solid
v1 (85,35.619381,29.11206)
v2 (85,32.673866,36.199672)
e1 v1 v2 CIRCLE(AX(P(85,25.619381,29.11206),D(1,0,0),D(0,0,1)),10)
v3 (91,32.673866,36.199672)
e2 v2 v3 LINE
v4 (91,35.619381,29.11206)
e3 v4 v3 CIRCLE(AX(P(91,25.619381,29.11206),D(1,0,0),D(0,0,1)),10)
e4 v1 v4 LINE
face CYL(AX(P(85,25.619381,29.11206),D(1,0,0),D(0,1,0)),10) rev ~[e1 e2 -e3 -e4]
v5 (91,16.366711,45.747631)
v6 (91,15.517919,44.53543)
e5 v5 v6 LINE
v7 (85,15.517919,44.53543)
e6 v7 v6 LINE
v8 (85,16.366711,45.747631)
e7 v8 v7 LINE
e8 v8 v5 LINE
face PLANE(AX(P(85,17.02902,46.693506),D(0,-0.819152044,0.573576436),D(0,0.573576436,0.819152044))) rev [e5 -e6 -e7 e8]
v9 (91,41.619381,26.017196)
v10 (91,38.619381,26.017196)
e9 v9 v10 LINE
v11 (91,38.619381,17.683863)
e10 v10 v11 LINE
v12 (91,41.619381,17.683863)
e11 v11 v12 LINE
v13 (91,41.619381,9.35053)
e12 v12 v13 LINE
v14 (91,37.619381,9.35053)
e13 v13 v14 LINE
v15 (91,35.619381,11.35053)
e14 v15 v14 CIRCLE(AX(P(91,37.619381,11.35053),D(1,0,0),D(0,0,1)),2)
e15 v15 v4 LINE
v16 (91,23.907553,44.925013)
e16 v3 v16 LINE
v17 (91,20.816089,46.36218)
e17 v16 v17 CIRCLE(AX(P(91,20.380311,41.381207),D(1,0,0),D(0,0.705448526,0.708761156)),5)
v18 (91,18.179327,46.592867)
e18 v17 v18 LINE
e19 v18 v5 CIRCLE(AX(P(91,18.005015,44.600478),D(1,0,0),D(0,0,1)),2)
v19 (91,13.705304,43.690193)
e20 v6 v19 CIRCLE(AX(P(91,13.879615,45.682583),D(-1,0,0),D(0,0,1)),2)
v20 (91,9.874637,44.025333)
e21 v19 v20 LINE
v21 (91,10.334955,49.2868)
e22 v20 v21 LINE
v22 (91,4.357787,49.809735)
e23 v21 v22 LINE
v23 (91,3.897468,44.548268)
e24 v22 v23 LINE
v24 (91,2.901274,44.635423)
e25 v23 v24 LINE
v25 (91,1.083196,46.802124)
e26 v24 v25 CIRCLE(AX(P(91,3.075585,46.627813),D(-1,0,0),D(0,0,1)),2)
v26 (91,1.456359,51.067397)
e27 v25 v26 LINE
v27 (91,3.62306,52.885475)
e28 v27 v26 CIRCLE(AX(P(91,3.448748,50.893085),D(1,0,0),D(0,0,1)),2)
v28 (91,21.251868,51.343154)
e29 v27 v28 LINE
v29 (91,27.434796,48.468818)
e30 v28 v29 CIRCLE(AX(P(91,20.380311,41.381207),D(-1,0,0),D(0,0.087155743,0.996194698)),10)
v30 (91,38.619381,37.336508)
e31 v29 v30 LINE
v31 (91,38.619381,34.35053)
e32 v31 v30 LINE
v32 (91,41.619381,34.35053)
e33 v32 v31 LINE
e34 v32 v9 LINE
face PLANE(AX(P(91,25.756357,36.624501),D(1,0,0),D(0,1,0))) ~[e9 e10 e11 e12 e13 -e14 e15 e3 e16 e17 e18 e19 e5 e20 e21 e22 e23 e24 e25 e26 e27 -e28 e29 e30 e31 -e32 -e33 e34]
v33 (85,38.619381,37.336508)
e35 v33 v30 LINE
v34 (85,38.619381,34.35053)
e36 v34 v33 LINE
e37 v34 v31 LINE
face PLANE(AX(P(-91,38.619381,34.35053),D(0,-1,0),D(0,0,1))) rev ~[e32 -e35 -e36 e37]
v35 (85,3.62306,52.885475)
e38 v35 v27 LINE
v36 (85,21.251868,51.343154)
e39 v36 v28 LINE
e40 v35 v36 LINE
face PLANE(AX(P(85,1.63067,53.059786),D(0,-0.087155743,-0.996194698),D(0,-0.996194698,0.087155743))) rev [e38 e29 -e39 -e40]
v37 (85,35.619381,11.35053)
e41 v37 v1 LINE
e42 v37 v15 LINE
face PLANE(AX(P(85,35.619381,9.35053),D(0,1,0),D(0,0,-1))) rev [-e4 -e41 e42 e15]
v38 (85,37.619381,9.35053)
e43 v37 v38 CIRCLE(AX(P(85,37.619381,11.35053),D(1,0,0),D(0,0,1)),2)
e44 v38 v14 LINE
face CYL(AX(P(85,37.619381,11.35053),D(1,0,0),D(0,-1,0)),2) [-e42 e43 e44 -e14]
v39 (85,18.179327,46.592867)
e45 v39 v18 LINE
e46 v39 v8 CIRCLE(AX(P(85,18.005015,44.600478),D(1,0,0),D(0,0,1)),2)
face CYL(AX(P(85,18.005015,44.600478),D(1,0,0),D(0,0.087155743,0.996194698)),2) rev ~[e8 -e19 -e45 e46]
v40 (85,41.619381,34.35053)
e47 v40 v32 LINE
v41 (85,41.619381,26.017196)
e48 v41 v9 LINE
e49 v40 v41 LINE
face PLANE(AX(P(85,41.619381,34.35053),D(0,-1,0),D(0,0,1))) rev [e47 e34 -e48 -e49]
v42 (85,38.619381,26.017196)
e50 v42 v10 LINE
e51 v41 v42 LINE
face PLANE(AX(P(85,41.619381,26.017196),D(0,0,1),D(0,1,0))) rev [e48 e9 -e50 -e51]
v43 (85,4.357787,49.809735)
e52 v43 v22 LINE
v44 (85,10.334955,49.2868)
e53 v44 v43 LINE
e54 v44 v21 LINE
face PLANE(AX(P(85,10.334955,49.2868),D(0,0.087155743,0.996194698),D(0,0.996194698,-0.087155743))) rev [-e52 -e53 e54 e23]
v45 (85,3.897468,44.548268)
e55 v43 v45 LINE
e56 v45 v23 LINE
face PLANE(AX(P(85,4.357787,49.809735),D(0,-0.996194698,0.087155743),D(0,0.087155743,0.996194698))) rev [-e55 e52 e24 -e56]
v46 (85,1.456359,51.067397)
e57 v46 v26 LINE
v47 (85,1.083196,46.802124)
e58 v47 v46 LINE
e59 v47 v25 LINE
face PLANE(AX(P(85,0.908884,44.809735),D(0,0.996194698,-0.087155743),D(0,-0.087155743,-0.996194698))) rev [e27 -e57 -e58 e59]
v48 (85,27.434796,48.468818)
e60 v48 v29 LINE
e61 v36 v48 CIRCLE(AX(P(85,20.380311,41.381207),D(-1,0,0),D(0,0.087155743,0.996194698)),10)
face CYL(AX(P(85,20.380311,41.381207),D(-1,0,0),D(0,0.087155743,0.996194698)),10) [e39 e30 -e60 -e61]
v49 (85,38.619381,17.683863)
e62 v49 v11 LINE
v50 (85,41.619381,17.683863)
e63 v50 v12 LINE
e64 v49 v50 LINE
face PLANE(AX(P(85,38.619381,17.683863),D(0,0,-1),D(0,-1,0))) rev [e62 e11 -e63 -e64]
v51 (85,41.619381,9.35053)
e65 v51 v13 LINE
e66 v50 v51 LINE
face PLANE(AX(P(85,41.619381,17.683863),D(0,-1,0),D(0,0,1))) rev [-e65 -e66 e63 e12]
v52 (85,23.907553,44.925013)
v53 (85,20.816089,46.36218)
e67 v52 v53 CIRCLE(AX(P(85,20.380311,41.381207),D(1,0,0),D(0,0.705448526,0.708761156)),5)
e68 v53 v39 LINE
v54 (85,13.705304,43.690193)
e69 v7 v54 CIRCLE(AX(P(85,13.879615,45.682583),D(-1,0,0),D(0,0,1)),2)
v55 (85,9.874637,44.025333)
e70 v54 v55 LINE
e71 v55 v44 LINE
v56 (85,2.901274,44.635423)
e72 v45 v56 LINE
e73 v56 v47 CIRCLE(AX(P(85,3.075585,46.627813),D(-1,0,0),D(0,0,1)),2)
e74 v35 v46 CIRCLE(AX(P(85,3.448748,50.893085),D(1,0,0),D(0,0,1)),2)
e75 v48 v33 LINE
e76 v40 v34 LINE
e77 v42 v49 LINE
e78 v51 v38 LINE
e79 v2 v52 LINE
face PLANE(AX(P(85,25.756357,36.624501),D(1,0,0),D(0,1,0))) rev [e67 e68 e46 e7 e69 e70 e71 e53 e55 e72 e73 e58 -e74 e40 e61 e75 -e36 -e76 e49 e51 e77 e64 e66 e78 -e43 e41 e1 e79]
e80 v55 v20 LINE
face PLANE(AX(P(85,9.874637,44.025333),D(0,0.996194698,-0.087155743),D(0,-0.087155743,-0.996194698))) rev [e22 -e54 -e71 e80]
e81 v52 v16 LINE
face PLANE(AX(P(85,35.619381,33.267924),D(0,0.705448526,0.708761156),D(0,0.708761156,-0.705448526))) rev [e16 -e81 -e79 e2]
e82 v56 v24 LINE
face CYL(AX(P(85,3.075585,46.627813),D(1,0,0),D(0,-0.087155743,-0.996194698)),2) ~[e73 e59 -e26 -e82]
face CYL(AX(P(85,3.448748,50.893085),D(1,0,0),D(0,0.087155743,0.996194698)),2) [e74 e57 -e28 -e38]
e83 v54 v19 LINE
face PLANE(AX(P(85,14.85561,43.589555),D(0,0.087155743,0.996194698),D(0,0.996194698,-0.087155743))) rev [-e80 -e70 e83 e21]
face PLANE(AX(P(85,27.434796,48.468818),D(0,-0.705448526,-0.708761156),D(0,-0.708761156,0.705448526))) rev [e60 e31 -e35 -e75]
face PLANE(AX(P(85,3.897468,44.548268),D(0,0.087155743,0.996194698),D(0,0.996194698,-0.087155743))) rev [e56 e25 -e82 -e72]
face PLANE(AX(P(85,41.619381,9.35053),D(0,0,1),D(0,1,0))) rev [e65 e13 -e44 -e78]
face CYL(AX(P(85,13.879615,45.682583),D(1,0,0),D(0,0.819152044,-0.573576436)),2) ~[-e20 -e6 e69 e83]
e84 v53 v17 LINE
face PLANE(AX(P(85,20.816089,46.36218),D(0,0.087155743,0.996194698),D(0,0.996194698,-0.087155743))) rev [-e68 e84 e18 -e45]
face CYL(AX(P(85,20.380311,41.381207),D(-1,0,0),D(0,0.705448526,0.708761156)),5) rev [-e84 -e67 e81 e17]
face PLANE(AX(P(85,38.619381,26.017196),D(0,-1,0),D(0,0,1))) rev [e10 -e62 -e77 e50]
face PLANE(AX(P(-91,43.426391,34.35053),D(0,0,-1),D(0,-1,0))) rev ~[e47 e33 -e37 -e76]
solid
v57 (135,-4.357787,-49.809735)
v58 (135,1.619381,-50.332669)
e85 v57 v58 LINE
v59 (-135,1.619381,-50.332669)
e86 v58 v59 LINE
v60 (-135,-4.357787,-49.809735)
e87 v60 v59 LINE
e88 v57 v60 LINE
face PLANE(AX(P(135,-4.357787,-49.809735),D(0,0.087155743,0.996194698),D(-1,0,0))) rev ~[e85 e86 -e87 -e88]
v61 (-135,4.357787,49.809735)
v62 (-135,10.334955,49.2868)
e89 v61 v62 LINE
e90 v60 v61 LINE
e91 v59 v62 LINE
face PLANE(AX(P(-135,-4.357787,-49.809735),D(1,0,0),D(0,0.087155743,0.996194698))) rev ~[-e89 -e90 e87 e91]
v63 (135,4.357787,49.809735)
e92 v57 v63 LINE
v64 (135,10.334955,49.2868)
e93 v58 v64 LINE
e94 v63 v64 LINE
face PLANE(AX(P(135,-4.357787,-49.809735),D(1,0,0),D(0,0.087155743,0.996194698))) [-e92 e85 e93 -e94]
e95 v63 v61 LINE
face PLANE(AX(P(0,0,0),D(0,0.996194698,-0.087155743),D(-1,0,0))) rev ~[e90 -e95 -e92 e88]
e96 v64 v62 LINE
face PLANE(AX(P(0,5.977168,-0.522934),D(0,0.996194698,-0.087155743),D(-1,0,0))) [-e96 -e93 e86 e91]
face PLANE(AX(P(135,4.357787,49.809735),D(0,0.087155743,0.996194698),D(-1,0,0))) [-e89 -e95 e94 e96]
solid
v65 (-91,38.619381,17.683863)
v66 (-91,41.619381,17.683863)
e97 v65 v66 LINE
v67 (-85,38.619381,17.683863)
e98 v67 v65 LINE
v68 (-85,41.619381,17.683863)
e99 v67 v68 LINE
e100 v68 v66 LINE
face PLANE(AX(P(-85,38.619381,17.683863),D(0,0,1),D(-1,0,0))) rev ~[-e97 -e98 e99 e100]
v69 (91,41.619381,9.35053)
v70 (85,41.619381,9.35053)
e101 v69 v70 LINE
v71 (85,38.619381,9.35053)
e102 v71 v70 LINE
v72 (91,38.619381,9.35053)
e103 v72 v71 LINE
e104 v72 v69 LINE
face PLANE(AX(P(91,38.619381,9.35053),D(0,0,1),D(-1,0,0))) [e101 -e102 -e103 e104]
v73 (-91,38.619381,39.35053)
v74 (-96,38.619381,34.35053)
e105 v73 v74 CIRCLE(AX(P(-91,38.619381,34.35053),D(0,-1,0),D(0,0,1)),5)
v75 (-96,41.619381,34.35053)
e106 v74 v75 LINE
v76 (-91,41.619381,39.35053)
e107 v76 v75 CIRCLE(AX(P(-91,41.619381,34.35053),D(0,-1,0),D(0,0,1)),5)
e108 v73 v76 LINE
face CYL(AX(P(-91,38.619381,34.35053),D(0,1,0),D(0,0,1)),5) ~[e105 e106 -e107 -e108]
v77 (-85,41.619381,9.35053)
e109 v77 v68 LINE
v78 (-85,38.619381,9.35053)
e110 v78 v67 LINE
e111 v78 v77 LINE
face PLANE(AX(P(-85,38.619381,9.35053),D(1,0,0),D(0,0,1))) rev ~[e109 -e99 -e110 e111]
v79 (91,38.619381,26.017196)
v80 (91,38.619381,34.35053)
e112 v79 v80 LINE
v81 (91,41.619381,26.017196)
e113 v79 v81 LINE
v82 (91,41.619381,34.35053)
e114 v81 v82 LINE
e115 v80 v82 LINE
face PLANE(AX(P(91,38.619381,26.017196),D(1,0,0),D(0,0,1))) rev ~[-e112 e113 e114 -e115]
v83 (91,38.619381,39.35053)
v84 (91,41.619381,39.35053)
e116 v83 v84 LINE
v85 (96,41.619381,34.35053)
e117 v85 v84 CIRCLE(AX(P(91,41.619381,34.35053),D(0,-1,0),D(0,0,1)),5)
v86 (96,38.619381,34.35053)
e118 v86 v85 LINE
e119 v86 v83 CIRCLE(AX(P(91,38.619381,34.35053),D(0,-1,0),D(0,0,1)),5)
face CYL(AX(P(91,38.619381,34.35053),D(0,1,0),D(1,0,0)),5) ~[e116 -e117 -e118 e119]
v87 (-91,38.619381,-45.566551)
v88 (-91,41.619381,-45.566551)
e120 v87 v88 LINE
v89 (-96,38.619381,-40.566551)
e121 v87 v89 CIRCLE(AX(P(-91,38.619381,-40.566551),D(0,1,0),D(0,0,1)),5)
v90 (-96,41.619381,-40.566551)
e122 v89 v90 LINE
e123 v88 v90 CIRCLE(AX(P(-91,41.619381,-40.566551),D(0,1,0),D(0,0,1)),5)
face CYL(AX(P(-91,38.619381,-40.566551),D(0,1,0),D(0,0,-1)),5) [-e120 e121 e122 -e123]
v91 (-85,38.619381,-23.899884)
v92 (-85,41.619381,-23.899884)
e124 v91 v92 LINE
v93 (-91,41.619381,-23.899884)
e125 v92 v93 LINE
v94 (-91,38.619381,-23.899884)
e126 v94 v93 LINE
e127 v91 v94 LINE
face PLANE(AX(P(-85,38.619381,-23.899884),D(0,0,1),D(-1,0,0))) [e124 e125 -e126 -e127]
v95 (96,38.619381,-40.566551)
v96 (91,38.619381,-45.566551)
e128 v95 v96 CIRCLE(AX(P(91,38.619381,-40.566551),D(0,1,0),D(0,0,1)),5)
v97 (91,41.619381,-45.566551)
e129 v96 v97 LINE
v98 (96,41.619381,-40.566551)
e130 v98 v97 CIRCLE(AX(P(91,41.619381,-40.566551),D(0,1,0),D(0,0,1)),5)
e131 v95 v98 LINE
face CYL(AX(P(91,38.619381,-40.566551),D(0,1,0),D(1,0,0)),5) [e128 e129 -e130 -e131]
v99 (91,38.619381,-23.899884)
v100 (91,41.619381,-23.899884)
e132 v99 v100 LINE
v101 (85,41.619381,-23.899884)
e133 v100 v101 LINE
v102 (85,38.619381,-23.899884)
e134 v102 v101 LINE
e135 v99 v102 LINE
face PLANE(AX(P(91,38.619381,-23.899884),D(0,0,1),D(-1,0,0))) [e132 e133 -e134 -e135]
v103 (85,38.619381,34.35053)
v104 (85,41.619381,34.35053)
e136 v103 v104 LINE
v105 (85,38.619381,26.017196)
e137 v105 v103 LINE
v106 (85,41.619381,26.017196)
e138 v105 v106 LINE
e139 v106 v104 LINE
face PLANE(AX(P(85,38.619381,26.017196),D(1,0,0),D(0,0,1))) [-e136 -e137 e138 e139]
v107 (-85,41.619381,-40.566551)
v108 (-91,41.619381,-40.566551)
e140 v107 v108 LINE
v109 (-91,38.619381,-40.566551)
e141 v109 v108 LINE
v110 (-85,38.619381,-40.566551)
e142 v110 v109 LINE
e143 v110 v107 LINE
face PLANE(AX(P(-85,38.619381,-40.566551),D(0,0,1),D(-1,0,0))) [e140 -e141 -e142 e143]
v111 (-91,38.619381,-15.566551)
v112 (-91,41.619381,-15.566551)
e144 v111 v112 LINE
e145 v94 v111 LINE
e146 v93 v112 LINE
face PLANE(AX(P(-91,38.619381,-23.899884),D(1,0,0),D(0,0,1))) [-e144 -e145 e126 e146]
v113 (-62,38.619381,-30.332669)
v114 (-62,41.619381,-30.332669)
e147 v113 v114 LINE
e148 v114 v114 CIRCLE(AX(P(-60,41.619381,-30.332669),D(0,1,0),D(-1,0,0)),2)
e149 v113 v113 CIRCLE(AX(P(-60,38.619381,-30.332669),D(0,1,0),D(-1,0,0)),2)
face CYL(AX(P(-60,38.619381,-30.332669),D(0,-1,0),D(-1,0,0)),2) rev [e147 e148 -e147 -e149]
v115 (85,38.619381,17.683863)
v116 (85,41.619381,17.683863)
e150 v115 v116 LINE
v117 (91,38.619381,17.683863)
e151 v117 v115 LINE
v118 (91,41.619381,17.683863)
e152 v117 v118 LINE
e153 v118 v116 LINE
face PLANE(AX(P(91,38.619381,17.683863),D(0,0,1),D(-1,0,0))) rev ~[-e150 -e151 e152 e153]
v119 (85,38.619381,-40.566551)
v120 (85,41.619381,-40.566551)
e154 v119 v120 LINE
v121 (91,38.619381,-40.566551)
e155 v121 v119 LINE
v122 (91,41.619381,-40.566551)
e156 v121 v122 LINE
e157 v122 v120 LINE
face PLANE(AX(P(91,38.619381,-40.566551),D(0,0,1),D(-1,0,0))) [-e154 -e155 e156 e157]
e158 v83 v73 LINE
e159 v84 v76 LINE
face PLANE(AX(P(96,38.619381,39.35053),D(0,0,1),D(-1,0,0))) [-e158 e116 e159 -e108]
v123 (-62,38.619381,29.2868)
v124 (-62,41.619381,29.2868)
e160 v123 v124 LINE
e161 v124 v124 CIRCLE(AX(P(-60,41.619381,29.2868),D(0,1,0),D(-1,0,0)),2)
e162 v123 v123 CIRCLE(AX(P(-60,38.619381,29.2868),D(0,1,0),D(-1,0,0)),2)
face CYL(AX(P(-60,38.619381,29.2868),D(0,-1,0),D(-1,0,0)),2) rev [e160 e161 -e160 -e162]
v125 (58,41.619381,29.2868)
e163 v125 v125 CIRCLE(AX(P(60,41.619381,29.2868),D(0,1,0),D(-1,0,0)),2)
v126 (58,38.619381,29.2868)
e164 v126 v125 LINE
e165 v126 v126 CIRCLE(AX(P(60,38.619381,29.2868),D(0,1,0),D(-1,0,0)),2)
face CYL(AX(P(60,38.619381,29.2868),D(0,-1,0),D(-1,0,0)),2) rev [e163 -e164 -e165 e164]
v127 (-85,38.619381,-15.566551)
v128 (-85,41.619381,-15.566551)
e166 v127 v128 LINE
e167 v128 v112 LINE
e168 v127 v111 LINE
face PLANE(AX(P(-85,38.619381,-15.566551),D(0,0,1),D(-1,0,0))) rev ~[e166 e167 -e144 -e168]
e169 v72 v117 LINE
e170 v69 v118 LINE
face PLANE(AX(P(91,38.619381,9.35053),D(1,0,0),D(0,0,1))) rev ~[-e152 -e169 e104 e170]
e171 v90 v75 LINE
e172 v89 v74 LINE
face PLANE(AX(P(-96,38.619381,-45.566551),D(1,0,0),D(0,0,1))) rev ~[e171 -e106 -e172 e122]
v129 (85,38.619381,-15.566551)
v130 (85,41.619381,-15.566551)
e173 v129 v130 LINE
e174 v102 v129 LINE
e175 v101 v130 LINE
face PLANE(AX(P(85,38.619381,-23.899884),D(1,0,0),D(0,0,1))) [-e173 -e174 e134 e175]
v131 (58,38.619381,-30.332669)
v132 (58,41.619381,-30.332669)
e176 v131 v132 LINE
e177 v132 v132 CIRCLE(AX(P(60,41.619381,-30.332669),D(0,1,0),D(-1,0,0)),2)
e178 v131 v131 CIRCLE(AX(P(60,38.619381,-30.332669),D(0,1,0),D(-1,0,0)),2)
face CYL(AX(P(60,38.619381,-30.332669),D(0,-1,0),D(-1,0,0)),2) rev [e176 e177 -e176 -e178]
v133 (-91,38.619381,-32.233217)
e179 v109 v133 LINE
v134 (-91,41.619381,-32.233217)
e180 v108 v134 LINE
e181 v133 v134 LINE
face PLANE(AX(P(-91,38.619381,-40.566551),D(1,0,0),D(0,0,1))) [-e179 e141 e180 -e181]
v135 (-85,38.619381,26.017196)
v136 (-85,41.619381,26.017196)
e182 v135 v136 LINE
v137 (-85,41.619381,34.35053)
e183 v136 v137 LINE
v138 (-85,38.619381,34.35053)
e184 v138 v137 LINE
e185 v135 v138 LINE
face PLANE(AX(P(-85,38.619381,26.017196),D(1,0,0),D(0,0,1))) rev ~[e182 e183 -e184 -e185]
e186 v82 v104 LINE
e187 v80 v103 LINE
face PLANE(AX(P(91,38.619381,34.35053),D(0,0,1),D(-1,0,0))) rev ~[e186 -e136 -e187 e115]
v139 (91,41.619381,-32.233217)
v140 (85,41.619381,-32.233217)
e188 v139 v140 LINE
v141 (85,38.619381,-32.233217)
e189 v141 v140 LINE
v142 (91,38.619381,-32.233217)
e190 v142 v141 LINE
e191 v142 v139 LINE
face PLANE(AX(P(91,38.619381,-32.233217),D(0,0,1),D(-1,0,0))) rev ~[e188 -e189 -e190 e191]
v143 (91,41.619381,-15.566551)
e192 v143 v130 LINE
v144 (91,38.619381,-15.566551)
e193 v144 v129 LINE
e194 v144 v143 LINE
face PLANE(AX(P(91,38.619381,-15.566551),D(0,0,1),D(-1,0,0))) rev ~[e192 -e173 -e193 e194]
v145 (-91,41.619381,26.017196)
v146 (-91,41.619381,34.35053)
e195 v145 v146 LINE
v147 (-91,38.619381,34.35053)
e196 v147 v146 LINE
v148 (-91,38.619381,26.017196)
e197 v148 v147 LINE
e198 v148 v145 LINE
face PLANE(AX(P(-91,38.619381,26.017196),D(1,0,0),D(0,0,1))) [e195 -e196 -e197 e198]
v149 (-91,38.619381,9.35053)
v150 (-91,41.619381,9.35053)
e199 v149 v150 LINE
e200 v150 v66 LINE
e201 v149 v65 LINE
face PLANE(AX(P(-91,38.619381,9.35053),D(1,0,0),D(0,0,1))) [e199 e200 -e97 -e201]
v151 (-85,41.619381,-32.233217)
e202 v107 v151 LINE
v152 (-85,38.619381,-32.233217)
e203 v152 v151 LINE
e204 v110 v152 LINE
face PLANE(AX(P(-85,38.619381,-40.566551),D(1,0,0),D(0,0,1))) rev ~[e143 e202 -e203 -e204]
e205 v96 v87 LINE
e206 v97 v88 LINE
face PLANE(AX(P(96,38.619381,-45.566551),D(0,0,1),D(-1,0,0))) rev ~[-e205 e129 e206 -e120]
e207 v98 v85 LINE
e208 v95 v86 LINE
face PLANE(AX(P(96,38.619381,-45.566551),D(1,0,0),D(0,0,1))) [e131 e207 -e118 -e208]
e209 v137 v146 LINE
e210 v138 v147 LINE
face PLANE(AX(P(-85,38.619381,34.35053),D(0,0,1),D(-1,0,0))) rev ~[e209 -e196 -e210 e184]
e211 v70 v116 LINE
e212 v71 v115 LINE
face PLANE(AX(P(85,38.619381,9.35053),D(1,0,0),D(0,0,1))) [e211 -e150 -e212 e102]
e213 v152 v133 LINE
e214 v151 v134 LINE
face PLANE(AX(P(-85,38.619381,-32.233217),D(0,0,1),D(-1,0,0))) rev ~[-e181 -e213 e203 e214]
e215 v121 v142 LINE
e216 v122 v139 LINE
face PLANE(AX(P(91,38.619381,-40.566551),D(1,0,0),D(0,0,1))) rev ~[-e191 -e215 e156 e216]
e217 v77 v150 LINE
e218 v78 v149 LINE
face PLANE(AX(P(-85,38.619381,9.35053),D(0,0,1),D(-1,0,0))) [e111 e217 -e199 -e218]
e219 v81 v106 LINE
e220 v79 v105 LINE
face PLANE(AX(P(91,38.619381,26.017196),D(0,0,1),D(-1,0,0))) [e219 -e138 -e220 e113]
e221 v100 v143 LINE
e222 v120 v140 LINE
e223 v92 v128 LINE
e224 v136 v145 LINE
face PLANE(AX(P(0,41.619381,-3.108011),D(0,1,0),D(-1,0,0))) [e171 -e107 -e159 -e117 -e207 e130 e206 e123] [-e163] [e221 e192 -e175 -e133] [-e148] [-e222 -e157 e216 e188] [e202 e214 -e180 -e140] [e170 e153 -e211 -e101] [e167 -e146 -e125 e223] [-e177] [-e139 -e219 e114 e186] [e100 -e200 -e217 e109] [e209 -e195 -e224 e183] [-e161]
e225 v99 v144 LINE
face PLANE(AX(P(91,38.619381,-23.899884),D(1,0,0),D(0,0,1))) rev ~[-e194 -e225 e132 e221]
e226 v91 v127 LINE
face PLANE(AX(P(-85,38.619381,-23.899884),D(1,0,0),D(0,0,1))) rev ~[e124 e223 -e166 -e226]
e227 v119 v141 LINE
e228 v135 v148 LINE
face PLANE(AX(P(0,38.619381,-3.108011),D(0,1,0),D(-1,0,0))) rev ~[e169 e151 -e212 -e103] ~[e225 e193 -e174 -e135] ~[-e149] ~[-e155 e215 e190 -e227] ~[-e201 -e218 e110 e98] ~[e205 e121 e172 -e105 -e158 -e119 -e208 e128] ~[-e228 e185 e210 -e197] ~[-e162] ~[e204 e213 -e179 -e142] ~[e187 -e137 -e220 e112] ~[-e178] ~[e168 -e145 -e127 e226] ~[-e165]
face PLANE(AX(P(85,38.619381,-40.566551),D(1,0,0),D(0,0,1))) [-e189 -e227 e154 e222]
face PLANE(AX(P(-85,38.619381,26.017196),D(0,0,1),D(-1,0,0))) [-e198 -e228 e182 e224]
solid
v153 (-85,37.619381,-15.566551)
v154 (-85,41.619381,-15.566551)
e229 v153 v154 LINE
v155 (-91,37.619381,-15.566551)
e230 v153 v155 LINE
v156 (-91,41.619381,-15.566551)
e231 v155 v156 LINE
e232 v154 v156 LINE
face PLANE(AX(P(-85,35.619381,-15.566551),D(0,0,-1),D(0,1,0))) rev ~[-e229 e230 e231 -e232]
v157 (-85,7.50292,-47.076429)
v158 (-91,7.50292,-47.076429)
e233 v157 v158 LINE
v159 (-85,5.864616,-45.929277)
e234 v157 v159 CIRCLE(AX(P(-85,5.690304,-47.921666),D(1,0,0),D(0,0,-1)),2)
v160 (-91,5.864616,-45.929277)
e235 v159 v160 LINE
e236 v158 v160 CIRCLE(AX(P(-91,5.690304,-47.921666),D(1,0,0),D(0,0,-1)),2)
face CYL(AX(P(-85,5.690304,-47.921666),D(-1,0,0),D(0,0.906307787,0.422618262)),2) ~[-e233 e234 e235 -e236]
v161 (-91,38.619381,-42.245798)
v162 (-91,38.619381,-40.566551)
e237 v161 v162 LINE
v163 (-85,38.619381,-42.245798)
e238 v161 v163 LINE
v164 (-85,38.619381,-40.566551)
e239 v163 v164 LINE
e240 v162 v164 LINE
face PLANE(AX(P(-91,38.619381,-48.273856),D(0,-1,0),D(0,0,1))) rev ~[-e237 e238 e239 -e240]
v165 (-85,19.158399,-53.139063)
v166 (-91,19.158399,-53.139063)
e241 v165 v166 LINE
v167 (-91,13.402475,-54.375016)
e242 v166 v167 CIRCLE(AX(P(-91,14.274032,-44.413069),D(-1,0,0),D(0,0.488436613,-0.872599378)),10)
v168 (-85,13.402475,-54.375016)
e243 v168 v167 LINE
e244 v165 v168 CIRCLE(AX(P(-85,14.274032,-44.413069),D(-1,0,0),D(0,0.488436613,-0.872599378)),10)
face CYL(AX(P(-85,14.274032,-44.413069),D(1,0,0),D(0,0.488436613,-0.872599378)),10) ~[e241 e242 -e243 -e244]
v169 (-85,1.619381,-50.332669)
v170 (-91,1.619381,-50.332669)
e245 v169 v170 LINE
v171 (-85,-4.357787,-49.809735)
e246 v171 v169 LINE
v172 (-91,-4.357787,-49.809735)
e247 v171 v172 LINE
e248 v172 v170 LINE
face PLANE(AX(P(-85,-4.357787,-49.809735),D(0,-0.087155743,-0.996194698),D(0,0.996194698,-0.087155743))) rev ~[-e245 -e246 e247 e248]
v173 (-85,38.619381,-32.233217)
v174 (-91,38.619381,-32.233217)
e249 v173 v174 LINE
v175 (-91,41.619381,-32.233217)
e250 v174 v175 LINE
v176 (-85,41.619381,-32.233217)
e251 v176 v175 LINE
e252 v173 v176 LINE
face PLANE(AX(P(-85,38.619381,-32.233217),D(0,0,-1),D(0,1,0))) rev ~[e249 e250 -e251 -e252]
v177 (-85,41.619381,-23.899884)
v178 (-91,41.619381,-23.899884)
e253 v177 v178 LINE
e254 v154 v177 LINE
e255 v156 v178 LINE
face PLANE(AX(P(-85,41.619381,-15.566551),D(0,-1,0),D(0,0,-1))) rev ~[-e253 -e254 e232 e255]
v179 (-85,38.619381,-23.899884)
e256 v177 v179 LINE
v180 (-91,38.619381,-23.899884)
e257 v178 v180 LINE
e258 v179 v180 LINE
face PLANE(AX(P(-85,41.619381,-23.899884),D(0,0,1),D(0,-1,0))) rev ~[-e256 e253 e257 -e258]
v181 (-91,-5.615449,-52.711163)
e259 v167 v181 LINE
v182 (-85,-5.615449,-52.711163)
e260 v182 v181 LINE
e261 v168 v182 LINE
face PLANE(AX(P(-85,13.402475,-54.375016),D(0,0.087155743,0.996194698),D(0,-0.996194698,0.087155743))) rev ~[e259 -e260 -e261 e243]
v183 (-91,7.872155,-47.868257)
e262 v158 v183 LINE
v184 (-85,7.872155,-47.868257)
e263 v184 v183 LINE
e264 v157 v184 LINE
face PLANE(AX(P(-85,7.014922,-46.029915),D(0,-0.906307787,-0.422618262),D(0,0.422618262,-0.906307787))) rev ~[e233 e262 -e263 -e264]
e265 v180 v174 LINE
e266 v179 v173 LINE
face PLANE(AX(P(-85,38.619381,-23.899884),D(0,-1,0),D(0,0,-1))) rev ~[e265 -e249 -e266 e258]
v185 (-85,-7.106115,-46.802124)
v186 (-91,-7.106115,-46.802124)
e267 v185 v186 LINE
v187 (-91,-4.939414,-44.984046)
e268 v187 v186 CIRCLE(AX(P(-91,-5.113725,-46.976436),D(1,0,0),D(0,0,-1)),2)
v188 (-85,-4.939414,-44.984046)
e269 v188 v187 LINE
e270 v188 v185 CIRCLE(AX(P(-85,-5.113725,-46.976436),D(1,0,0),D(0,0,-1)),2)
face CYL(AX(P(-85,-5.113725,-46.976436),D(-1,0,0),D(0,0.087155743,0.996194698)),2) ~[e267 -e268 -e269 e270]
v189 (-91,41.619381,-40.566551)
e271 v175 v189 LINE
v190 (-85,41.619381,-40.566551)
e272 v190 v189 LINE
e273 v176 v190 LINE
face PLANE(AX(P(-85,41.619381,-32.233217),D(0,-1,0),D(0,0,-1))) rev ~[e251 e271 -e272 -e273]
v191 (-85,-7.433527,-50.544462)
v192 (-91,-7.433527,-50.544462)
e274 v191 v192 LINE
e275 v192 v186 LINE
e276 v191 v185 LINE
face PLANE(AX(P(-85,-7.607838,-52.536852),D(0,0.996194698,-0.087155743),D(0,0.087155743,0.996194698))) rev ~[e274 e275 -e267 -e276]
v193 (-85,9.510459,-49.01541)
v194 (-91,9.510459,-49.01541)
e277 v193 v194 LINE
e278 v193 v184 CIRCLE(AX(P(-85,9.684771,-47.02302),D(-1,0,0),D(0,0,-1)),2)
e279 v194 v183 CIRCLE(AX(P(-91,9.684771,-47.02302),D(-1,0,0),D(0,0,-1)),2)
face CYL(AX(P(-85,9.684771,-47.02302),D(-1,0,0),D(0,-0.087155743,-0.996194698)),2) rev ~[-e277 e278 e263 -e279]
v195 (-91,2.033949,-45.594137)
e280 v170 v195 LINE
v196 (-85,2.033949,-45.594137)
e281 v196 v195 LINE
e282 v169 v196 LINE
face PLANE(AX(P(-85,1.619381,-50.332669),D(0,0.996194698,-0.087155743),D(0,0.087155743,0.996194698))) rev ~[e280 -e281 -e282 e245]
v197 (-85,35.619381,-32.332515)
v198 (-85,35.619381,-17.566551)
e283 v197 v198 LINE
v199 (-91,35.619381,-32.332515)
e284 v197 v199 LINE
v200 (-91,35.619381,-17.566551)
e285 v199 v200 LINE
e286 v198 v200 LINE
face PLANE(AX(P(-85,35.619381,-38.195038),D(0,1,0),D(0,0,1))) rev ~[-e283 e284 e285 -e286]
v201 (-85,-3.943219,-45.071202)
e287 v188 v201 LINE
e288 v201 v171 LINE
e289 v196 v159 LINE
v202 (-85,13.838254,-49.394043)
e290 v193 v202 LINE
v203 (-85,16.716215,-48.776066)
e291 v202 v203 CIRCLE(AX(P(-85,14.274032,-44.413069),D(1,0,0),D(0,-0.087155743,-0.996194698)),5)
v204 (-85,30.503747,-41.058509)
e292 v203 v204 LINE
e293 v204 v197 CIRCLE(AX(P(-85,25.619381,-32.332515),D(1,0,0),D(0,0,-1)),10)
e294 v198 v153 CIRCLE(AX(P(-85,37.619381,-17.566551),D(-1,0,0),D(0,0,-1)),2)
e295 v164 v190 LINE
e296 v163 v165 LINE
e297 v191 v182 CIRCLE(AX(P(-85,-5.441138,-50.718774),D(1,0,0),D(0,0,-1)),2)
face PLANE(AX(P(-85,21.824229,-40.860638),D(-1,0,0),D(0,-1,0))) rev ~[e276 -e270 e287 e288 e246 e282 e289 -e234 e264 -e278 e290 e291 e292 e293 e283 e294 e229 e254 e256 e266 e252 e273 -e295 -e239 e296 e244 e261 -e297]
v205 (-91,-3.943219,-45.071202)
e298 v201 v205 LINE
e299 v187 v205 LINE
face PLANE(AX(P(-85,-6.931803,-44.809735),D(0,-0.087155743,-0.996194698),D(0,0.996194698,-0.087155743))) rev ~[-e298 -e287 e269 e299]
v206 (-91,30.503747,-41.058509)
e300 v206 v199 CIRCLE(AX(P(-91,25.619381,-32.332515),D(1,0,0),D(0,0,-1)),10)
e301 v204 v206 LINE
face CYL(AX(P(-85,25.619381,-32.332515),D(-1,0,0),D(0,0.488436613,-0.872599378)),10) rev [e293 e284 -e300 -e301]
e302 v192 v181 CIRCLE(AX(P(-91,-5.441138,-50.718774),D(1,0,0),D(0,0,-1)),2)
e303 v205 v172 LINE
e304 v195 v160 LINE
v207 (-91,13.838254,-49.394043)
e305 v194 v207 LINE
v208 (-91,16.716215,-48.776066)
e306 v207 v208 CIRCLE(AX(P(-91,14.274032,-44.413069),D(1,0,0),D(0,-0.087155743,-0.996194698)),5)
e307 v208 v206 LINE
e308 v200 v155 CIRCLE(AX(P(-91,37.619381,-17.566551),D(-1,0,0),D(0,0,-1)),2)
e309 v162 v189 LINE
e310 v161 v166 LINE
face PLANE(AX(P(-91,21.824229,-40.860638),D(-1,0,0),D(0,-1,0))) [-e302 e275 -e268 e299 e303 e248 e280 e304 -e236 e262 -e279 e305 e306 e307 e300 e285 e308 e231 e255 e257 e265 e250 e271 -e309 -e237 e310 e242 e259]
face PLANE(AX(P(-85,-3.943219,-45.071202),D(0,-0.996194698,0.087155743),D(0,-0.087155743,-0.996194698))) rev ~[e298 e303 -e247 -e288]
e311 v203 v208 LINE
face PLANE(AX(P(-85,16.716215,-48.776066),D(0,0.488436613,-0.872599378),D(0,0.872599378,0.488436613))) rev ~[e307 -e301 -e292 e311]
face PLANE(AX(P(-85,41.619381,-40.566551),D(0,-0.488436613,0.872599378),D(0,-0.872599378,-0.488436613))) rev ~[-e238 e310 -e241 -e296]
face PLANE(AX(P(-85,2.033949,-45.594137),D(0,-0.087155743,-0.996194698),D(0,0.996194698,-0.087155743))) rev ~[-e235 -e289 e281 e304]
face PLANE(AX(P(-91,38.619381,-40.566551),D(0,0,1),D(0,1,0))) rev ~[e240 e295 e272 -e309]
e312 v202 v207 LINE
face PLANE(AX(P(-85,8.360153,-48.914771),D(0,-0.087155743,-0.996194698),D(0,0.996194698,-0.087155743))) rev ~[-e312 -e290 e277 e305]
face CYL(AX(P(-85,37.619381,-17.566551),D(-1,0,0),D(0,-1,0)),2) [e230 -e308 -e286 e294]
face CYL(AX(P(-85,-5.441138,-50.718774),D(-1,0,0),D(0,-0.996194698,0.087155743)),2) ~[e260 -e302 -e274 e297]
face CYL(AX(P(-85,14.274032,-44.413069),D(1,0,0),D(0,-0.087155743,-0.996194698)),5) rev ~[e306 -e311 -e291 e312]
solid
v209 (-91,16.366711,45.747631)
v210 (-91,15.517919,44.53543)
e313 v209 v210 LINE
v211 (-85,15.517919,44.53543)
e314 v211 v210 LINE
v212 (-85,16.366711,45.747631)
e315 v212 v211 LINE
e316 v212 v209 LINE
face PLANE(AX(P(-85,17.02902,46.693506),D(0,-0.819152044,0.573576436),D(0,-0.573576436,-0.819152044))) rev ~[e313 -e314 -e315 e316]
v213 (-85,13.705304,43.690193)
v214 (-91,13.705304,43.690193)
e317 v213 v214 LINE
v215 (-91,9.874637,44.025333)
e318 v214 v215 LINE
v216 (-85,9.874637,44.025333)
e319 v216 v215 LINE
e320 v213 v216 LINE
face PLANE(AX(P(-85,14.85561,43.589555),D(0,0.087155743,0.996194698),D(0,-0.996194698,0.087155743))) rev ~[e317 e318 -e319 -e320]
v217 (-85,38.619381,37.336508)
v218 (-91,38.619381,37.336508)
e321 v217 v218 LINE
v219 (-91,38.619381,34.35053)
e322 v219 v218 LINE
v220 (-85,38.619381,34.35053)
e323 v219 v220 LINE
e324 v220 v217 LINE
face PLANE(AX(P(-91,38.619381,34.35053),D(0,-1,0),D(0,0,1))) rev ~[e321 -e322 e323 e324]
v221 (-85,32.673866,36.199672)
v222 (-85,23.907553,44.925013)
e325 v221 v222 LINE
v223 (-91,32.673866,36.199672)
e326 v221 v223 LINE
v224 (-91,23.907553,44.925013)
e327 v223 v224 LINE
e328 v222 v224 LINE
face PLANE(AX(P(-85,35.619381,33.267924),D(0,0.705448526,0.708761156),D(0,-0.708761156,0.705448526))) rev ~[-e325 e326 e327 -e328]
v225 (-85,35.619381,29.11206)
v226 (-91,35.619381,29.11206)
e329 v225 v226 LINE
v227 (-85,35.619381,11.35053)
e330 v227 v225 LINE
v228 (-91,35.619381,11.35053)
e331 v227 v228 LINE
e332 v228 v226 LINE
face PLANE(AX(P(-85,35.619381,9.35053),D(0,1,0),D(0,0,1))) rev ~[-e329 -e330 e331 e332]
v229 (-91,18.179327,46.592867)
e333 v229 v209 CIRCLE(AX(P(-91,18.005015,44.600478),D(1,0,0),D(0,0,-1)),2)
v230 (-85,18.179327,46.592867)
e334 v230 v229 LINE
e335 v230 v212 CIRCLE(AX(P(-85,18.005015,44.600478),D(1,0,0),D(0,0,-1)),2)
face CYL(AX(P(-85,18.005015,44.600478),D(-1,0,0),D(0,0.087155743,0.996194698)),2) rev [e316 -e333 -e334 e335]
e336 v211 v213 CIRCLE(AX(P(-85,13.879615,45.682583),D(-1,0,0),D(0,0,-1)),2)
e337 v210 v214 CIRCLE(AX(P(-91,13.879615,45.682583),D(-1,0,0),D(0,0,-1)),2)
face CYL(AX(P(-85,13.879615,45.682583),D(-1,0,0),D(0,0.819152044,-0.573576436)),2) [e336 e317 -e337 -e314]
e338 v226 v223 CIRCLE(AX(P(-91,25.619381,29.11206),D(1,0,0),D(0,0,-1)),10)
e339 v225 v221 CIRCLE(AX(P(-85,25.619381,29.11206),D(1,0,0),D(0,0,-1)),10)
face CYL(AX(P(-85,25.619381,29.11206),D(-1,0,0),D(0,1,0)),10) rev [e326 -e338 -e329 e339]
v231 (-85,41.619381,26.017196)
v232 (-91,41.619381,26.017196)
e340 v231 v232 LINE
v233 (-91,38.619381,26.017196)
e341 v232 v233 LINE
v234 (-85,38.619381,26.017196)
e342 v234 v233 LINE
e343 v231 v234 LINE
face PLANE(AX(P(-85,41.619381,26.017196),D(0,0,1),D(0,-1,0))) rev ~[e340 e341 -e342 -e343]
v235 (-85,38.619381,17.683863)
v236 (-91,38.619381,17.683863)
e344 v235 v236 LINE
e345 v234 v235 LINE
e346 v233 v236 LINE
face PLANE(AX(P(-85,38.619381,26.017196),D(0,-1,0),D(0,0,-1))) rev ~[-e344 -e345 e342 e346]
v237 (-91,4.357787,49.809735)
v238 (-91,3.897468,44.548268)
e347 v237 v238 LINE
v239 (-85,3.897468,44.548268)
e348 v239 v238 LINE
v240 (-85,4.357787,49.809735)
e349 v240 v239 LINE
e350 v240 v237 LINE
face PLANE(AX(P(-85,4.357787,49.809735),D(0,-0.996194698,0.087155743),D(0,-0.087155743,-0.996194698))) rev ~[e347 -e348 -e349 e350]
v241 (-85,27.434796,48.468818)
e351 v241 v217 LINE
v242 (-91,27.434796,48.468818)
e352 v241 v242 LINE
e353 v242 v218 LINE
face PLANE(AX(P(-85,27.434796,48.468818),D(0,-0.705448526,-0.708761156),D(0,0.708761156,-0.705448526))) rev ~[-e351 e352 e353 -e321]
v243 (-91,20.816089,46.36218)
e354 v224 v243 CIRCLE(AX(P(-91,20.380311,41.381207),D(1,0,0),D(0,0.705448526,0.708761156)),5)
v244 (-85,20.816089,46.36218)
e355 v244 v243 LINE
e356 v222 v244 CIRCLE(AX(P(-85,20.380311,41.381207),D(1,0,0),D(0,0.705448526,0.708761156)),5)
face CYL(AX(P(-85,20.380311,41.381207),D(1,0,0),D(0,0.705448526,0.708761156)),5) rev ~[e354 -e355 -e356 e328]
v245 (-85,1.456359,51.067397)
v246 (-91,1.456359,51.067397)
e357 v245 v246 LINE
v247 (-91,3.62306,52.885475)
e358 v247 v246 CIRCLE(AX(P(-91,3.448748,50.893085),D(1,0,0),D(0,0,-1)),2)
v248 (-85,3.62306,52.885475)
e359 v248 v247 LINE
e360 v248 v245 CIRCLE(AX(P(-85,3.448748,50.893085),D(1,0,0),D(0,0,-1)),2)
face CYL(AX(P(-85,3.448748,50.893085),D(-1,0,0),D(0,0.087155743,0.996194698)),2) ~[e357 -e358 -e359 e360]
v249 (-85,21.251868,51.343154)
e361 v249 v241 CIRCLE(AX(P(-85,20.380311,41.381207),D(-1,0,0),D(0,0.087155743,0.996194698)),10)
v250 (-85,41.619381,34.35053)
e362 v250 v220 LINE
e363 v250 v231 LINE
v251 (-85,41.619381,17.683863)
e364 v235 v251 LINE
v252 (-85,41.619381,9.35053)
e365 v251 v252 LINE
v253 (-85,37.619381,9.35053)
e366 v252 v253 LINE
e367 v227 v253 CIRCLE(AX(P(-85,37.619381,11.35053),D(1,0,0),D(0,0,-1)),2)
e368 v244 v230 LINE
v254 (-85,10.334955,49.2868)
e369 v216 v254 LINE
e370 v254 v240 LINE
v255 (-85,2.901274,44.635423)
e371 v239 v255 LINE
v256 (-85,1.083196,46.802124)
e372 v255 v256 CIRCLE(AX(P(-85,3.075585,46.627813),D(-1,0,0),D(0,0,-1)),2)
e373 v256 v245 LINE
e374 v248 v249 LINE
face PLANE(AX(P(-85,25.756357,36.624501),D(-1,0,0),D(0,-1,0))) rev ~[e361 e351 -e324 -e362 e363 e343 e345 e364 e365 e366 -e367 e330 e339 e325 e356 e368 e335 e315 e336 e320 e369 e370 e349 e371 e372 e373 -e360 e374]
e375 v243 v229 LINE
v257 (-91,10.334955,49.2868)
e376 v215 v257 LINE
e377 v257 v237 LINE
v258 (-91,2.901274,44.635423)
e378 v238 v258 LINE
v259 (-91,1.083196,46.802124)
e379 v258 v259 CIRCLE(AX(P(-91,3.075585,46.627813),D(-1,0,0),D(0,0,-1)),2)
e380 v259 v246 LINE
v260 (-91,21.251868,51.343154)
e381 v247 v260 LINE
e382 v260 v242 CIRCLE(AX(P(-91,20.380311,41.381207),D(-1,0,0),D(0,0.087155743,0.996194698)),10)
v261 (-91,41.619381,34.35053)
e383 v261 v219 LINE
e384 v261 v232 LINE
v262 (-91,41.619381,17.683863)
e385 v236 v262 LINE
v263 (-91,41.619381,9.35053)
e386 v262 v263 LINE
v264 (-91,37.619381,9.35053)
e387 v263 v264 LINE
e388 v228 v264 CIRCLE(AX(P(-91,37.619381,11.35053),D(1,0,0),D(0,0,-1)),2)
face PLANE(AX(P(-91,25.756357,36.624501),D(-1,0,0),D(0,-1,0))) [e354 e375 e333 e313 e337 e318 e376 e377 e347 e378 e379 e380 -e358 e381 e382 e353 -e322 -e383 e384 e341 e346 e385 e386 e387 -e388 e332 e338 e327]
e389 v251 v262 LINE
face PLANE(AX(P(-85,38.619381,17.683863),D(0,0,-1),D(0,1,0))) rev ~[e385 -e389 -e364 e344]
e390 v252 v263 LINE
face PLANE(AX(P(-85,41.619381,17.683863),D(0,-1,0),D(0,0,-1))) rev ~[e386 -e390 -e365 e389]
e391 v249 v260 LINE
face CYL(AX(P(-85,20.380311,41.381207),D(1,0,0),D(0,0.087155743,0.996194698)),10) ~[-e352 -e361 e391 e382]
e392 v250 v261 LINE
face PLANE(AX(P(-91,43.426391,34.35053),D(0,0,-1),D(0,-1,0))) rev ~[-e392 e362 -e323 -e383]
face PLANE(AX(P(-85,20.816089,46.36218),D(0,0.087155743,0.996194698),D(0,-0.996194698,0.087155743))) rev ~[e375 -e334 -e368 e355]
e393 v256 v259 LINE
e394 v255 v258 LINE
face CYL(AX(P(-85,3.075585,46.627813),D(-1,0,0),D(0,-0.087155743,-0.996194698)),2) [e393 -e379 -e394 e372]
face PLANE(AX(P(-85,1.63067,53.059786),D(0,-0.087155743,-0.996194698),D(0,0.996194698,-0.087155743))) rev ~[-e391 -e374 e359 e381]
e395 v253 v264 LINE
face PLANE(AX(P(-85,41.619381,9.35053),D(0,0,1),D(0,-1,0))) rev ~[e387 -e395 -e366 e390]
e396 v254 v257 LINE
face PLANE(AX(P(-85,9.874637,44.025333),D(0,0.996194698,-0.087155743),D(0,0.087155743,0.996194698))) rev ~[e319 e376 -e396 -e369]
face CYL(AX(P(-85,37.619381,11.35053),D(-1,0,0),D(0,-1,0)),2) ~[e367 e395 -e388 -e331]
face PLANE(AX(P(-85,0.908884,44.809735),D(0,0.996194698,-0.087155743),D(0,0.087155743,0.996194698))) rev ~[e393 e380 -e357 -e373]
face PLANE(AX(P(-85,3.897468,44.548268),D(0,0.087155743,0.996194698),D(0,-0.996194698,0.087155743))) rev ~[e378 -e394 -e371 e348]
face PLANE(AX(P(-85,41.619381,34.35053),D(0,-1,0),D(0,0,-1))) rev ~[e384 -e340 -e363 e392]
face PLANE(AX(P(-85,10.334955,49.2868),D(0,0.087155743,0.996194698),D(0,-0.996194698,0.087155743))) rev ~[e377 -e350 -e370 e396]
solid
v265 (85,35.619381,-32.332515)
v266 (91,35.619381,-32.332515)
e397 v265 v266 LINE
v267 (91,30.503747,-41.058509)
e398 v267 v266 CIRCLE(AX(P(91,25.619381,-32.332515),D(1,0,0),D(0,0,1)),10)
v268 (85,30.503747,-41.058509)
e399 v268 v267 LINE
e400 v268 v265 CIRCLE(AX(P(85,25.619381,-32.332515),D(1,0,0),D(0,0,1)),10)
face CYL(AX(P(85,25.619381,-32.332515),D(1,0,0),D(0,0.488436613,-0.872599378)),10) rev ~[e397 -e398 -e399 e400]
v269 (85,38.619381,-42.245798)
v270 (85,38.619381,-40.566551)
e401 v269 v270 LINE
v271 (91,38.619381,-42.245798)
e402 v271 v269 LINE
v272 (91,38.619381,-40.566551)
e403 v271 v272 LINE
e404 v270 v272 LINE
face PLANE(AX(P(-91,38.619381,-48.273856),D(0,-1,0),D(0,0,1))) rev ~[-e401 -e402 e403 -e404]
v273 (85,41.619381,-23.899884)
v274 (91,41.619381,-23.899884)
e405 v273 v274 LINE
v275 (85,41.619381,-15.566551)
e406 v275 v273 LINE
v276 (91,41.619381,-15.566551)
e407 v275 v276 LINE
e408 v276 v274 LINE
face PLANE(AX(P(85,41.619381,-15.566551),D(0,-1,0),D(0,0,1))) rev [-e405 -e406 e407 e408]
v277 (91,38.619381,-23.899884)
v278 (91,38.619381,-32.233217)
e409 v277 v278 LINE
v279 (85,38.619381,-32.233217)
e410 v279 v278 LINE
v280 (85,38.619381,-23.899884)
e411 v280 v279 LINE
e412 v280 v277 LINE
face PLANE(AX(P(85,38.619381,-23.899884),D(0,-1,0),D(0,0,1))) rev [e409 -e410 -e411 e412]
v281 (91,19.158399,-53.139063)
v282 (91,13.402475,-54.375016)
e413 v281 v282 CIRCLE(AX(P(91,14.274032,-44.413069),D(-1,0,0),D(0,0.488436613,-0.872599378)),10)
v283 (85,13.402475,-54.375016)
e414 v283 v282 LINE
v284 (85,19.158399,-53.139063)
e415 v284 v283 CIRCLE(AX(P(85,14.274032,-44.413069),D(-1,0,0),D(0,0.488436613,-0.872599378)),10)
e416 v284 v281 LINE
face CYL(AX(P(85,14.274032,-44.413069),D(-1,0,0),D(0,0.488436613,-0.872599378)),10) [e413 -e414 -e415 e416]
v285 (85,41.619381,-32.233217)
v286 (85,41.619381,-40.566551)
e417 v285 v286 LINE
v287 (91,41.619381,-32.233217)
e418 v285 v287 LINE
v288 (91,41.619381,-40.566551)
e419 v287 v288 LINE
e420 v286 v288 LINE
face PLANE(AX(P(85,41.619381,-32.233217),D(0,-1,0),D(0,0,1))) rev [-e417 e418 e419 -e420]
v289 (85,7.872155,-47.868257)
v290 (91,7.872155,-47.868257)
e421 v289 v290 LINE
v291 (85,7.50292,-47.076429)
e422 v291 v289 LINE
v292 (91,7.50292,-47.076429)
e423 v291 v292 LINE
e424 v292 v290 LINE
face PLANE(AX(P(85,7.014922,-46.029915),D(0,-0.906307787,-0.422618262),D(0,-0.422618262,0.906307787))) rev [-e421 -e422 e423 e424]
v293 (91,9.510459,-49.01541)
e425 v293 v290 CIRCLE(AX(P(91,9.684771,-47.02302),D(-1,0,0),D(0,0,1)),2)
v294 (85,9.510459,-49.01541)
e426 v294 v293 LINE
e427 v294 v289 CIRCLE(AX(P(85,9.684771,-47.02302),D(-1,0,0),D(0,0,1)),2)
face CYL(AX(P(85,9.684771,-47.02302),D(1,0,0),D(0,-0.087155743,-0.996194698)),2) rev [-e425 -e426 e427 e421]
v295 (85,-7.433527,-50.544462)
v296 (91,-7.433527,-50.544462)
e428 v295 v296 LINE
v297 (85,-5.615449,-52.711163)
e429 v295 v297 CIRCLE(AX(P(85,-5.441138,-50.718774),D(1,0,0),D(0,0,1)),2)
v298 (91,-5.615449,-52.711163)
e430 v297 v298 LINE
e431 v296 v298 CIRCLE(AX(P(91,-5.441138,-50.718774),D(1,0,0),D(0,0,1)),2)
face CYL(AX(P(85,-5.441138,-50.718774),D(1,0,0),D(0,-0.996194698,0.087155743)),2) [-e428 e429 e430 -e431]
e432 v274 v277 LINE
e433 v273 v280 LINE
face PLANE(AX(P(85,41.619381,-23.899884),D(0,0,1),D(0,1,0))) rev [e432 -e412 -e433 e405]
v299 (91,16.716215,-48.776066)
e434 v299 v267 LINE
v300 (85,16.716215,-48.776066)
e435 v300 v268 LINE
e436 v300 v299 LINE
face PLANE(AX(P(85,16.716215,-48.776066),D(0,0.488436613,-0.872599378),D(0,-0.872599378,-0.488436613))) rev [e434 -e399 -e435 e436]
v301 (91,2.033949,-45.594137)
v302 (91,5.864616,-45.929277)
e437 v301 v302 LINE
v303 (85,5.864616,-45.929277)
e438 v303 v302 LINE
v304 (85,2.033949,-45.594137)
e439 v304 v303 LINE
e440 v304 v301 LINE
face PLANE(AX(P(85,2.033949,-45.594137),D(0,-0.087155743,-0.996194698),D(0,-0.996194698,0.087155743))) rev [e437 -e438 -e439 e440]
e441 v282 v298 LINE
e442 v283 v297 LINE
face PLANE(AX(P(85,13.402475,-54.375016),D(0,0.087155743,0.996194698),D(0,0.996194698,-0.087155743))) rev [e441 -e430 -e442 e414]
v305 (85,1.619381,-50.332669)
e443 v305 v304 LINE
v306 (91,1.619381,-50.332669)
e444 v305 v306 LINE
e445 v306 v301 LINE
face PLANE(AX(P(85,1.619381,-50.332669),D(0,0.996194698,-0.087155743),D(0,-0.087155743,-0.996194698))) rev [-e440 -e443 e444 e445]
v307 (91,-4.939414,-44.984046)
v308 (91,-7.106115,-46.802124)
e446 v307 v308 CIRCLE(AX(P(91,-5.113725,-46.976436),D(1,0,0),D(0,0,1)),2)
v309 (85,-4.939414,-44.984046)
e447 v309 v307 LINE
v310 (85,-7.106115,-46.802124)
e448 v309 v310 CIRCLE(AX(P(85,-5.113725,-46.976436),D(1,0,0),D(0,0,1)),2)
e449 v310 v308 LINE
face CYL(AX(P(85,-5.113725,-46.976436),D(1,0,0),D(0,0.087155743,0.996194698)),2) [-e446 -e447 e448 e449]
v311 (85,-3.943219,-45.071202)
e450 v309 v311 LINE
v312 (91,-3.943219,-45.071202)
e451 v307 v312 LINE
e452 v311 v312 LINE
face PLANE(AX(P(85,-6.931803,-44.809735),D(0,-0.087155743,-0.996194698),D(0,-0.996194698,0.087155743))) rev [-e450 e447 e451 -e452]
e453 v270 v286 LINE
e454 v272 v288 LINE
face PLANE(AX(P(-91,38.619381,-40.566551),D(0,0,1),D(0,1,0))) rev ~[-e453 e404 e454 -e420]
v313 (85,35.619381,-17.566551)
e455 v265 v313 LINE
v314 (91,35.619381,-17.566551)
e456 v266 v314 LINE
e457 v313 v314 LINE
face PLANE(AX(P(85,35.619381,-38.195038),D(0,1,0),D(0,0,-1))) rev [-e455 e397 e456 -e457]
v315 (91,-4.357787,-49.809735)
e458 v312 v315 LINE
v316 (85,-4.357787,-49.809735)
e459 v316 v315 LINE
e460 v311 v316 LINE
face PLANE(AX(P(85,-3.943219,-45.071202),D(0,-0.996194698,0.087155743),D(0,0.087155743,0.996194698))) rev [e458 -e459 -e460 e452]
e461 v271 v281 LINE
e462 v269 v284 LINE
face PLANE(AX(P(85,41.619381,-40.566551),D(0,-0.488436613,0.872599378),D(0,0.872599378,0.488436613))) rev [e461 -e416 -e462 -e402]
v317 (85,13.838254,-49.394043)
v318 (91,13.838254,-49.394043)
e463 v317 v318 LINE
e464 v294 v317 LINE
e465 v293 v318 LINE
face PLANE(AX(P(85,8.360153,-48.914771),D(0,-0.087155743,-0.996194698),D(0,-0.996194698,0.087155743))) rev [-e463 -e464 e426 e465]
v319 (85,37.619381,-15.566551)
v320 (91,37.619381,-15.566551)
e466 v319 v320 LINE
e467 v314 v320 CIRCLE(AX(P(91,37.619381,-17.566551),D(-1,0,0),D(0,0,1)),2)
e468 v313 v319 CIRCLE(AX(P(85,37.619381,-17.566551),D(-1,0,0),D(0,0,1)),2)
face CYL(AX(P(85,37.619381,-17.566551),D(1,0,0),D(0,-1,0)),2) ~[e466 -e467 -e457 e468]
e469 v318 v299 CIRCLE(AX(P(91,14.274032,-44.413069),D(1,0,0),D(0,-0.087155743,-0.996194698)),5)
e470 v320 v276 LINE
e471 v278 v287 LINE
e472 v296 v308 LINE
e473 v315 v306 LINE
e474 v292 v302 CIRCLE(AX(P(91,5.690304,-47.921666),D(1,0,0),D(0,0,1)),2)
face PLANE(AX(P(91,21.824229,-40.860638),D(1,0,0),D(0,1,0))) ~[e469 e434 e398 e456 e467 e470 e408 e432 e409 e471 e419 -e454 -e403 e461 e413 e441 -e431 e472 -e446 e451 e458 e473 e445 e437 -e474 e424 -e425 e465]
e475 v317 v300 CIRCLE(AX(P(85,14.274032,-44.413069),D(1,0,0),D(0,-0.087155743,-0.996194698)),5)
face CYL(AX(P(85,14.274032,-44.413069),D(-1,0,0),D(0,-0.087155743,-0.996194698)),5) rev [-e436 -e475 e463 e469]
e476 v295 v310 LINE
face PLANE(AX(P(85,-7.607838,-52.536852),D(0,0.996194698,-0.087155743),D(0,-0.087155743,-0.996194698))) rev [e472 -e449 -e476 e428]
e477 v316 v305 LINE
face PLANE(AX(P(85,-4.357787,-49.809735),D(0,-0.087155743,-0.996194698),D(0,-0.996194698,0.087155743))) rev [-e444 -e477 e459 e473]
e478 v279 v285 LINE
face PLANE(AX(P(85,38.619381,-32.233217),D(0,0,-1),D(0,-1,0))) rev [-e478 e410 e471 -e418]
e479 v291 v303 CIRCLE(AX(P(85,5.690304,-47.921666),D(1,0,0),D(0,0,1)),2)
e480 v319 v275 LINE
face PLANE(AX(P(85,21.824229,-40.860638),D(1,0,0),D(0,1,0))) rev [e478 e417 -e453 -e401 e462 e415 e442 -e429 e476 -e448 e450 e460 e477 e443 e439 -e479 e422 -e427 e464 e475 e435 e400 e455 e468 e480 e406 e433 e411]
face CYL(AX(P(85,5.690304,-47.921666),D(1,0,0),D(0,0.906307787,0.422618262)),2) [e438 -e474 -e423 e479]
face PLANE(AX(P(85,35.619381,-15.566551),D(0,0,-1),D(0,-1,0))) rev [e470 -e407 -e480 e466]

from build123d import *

# Parameters (mm, degrees)
F2_W      = 270
F2_H      = 100
F3_DEPTH  = 6
F6_DEPTH  = 6
F8_R      = 10
F8_2_R    = 10
F8_3_R    = 10
F8_4_R    = 10
F9_R      = 2
F9_2_R    = 2
F9_3_R    = 2
F9_4_R    = 2
F10_W     = 192
F10_H     = 84.9170803202
F10_W_2   = 6
F10_H_2   = 8.3333333333
F10_R     = 2
F11_DEPTH = 3
F12_R     = 5
F14_DEPTH = 703


with BuildPart() as f3:
    # F2 (on line) → F3 (new body)
    with BuildSketch(Plane(origin=(0, 0, 0), x_dir=(-1, 0, 0), z_dir=(0, 0.9961946981, -0.0871557427))):
        Rectangle(F2_W, F2_H)
    extrude(amount=F3_DEPTH)


with BuildPart() as f6:
    # F5 (on offset) → F6 (new body)
    with BuildSketch(Plane(origin=(-85, 0, 0), x_dir=(0, -1, 0), z_dir=(-1, 0, 0))):
        with BuildLine():
            Line((-3.8974684014, 44.5482676763), (-0.9088843071, 44.8097349046))
            Line((-0.9088843071, 44.8097349046), (-1.6306702714, 53.0597862271))
            Line((-1.6306702714, 53.0597862271), (-21.2518680197, 51.3431538593))
            ThreePointArc((-21.2518680197, 51.3431538593), (-24.5958757045, 50.4492282053), (-27.4347958571, 48.46881844))
            Line((-27.4347958571, 48.46881844), (-41.6193810512, 34.350529596))
            Line((-41.6193810512, 34.350529596), (-41.6193810512, 26.0171962627))
            Line((-41.6193810512, 26.0171962627), (-38.6193810512, 26.0171962627))
            Line((-38.6193810512, 26.0171962627), (-38.6193810512, 17.6838629293))
            Line((-38.6193810512, 17.6838629293), (-41.6193810512, 17.6838629293))
            Line((-41.6193810512, 17.6838629293), (-41.6193810512, 9.350529596))
            Line((-41.6193810512, 9.350529596), (-35.6193810512, 9.350529596))
            Line((-35.6193810512, 9.350529596), (-35.6193810512, 33.2679239334))
            Line((-35.6193810512, 33.2679239334), (-23.9075532246, 44.9250126592))
            ThreePointArc((-23.9075532246, 44.9250126592), (-22.4880931483, 45.9152175418), (-20.8160893059, 46.3621803689))
            Line((-20.8160893059, 46.3621803689), (-17.0290202972, 46.6935059751))
            Line((-17.0290202972, 46.6935059751), (-14.8556100804, 43.5895545061))
            Line((-14.8556100804, 43.5895545061), (-9.8746365899, 44.0253332199))
            Line((-9.8746365899, 44.0253332199), (-10.3349553259, 49.2868004481))
            Line((-10.3349553259, 49.2868004481), (-4.3577871374, 49.8097349046))
            Line((-4.3577871374, 49.8097349046), (-3.8974684014, 44.5482676763))
        make_face()
    extrude(amount=F6_DEPTH)


with BuildPart() as f6b:
    # F5 (on offset) → F6, piece 2 (new body)
    with BuildSketch(Plane(origin=(-85, 0, 0), x_dir=(0, -1, 0), z_dir=(-1, 0, 0))):
        with BuildLine():
            Line((6.9318033324, -44.8097349046), (3.9432192381, -45.0712021328))
            Line((3.9432192381, -45.0712021328), (4.3577871374, -49.8097349046))
            Line((4.3577871374, -49.8097349046), (-1.6193810512, -50.3326693611))
            Line((-1.6193810512, -50.3326693611), (-2.0339489504, -45.5941365893))
            Line((-2.0339489504, -45.5941365893), (-7.0149224409, -46.0299153031))
            Line((-7.0149224409, -46.0299153031), (-8.3601526442, -48.9147707838))
            Line((-8.3601526442, -48.9147707838), (-13.8382536726, -49.3940425214))
            ThreePointArc((-13.8382536726, -49.3940425214), (-15.3237410956, -49.3016385176), (-16.7162154514, -48.7760659227))
            Line((-16.7162154514, -48.7760659227), (-35.6193810512, -38.1950382371))
            Line((-35.6193810512, -38.1950382371), (-35.6193810512, -15.5665507242))
            Line((-35.6193810512, -15.5665507242), (-41.6193810512, -15.5665507242))
            Line((-41.6193810512, -15.5665507242), (-41.6193810512, -23.8998840575))
            Line((-41.6193810512, -23.8998840575), (-38.6193810512, -23.8998840575))
            Line((-38.6193810512, -23.8998840575), (-38.6193810512, -32.2332173909))
            Line((-38.6193810512, -32.2332173909), (-41.6193810512, -32.2332173909))
            Line((-41.6193810512, -32.2332173909), (-41.6193810512, -40.5665507242))
            Line((-41.6193810512, -40.5665507242), (-19.1583985164, -53.1390628144))
            ThreePointArc((-19.1583985164, -53.1390628144), (-16.3734498049, -54.1902080042), (-13.4024749589, -54.3750160119))
            Line((-13.4024749589, -54.3750160119), (7.6078384599, -52.5368517706))
            Line((7.6078384599, -52.5368517706), (6.9318033324, -44.8097349046))
        make_face()
    extrude(amount=F6_DEPTH)


with BuildPart() as f7_1:
    # F7: instance of F6
    add(f6.part.mirror(Plane.YZ))

    # F8#3
    f8_3_edges = [f7_1.edges().sort_by_distance(p)[0] for p in [
        (88, 35.619381, 33.267924),
    ]]
    fillet(f8_3_edges, radius=F8_3_R)

    # F9#3
    f9_3_edges = [f7_1.edges().sort_by_distance(p)[0] for p in [
        (88, 35.619381, 9.35053),
        (88, 1.63067, 53.059786),
        (88, 0.908884, 44.809735),
        (88, 17.02902, 46.693506),
        (88, 14.85561, 43.589555),
    ]]
    fillet(f9_3_edges, radius=F9_3_R)


with BuildPart() as f7_2:
    # F7: instance of F6b
    add(f6b.part.mirror(Plane.YZ))

    # F8#4
    f8_4_edges = [f7_2.edges().sort_by_distance(p)[0] for p in [
        (88, 35.619381, -38.195038),
    ]]
    fillet(f8_4_edges, radius=F8_4_R)

    # F9#4
    f9_4_edges = [f7_2.edges().sort_by_distance(p)[0] for p in [
        (88, 7.014922, -46.029915),
        (88, 8.360153, -48.914771),
        (88, 35.619381, -15.566551),
        (88, -6.931803, -44.809735),
        (88, -7.607838, -52.536852),
    ]]
    fillet(f9_4_edges, radius=F9_4_R)


with BuildPart() as f6_1:
    add(f6.part)

    # F8
    f8_edges = [f6_1.edges().sort_by_distance(p)[0] for p in [
        (-88, 35.619381, 33.267924),
    ]]
    fillet(f8_edges, radius=F8_R)

    # F9
    f9_edges = [f6_1.edges().sort_by_distance(p)[0] for p in [
        (-88, 35.619381, 9.35053),
        (-88, 1.63067, 53.059786),
        (-88, 0.908884, 44.809735),
        (-88, 17.02902, 46.693506),
        (-88, 14.85561, 43.589555),
    ]]
    fillet(f9_edges, radius=F9_R)


with BuildPart() as f6b_1:
    add(f6b.part)

    # F8#2
    f8_2_edges = [f6b_1.edges().sort_by_distance(p)[0] for p in [
        (-88, 35.619381, -38.195038),
    ]]
    fillet(f8_2_edges, radius=F8_2_R)

    # F9#2
    f9_2_edges = [f6b_1.edges().sort_by_distance(p)[0] for p in [
        (-88, 35.619381, -15.566551),
        (-88, -6.931803, -44.809735),
        (-88, -7.607838, -52.536852),
        (-88, 8.360153, -48.914771),
        (-88, 7.014922, -46.029915),
    ]]
    fillet(f9_2_edges, radius=F9_2_R)


with BuildPart() as f11:
    # F10 (on face) → F11 (new body)
    with BuildSketch(Plane(origin=(0, 38.6193810512, 0), x_dir=(-1, 0, 0), z_dir=(0, 1, 0))):
        with Locations((0, -3.1080105641)):
            Rectangle(F10_W, F10_H)
        with Locations((-88, -36.3998840575)):
            Rectangle(F10_W_2, F10_H_2, mode=Mode.SUBTRACT)
        with Locations((-60, -30.3326693611)):
            Circle(F10_R, mode=Mode.SUBTRACT)
        with Locations((-88, -19.7332173909)):
            Rectangle(F10_W_2, F10_H_2, mode=Mode.SUBTRACT)
        with Locations((88, -36.3998840575)):
            Rectangle(F10_W_2, F10_H_2, mode=Mode.SUBTRACT)
        with Locations((60, -30.3326693611)):
            Circle(F10_R, mode=Mode.SUBTRACT)
        with Locations((88, -19.7332173909)):
            Rectangle(F10_W_2, F10_H_2, mode=Mode.SUBTRACT)
        with Locations((-88, 13.5171962627)):
            Rectangle(F10_W_2, F10_H_2, mode=Mode.SUBTRACT)
        with Locations((-88, 30.1838629293)):
            Rectangle(F10_W_2, F10_H_2, mode=Mode.SUBTRACT)
        with Locations((-60, 29.2868004481)):
            Circle(F10_R, mode=Mode.SUBTRACT)
        with Locations((88, 13.5171962627)):
            Rectangle(F10_W_2, F10_H_2, mode=Mode.SUBTRACT)
        with Locations((60, 29.2868004481)):
            Circle(F10_R, mode=Mode.SUBTRACT)
        with Locations((88, 30.1838629293)):
            Rectangle(F10_W_2, F10_H_2, mode=Mode.SUBTRACT)
    extrude(amount=F11_DEPTH)

    # F12
    f12_edges = [f11.edges().sort_by_distance(p)[0] for p in [
        (96, 40.119381, 39.35053),
        (96, 40.119381, -45.566551),
        (-96, 40.119381, -45.566551),
        (-96, 40.119381, 39.35053),
    ]]
    fillet(f12_edges, radius=F12_R)


with BuildPart() as f14_tool:
    # F13 (on face) → F14 (new body)
    with BuildSketch(Plane(origin=(-91, 0, 0), x_dir=(0, -1, 0), z_dir=(-1, 0, 0))):
        Polygon((-38.6193810512, 40.4036790133), (-43.4263913442, 34.350529596), (-38.6193810512, 34.350529596), align=None)
        Polygon((-38.6193810512, -40.5665507242), (-45.0114011765, -40.5665507242), (-38.6193810512, -48.2738559767), align=None)
    extrude(amount=-F14_DEPTH)


with BuildPart() as f6_2:
    add(f6_1.part)

    # F14: cut by f14_tool
    add(f14_tool.part, mode=Mode.SUBTRACT)


with BuildPart() as f6b_2:
    add(f6b_1.part)

    # F14: cut by f14_tool
    add(f14_tool.part, mode=Mode.SUBTRACT)


with BuildPart() as f7_1_1:
    add(f7_1.part)

    # F14: cut by f14_tool
    add(f14_tool.part, mode=Mode.SUBTRACT)


with BuildPart() as f7_2_1:
    add(f7_2.part)

    # F14: cut by f14_tool
    add(f14_tool.part, mode=Mode.SUBTRACT)


solid = Compound([f3.part, f11.part, f6_2.part, f6b_2.part, f7_1_1.part, f7_2_1.part])
